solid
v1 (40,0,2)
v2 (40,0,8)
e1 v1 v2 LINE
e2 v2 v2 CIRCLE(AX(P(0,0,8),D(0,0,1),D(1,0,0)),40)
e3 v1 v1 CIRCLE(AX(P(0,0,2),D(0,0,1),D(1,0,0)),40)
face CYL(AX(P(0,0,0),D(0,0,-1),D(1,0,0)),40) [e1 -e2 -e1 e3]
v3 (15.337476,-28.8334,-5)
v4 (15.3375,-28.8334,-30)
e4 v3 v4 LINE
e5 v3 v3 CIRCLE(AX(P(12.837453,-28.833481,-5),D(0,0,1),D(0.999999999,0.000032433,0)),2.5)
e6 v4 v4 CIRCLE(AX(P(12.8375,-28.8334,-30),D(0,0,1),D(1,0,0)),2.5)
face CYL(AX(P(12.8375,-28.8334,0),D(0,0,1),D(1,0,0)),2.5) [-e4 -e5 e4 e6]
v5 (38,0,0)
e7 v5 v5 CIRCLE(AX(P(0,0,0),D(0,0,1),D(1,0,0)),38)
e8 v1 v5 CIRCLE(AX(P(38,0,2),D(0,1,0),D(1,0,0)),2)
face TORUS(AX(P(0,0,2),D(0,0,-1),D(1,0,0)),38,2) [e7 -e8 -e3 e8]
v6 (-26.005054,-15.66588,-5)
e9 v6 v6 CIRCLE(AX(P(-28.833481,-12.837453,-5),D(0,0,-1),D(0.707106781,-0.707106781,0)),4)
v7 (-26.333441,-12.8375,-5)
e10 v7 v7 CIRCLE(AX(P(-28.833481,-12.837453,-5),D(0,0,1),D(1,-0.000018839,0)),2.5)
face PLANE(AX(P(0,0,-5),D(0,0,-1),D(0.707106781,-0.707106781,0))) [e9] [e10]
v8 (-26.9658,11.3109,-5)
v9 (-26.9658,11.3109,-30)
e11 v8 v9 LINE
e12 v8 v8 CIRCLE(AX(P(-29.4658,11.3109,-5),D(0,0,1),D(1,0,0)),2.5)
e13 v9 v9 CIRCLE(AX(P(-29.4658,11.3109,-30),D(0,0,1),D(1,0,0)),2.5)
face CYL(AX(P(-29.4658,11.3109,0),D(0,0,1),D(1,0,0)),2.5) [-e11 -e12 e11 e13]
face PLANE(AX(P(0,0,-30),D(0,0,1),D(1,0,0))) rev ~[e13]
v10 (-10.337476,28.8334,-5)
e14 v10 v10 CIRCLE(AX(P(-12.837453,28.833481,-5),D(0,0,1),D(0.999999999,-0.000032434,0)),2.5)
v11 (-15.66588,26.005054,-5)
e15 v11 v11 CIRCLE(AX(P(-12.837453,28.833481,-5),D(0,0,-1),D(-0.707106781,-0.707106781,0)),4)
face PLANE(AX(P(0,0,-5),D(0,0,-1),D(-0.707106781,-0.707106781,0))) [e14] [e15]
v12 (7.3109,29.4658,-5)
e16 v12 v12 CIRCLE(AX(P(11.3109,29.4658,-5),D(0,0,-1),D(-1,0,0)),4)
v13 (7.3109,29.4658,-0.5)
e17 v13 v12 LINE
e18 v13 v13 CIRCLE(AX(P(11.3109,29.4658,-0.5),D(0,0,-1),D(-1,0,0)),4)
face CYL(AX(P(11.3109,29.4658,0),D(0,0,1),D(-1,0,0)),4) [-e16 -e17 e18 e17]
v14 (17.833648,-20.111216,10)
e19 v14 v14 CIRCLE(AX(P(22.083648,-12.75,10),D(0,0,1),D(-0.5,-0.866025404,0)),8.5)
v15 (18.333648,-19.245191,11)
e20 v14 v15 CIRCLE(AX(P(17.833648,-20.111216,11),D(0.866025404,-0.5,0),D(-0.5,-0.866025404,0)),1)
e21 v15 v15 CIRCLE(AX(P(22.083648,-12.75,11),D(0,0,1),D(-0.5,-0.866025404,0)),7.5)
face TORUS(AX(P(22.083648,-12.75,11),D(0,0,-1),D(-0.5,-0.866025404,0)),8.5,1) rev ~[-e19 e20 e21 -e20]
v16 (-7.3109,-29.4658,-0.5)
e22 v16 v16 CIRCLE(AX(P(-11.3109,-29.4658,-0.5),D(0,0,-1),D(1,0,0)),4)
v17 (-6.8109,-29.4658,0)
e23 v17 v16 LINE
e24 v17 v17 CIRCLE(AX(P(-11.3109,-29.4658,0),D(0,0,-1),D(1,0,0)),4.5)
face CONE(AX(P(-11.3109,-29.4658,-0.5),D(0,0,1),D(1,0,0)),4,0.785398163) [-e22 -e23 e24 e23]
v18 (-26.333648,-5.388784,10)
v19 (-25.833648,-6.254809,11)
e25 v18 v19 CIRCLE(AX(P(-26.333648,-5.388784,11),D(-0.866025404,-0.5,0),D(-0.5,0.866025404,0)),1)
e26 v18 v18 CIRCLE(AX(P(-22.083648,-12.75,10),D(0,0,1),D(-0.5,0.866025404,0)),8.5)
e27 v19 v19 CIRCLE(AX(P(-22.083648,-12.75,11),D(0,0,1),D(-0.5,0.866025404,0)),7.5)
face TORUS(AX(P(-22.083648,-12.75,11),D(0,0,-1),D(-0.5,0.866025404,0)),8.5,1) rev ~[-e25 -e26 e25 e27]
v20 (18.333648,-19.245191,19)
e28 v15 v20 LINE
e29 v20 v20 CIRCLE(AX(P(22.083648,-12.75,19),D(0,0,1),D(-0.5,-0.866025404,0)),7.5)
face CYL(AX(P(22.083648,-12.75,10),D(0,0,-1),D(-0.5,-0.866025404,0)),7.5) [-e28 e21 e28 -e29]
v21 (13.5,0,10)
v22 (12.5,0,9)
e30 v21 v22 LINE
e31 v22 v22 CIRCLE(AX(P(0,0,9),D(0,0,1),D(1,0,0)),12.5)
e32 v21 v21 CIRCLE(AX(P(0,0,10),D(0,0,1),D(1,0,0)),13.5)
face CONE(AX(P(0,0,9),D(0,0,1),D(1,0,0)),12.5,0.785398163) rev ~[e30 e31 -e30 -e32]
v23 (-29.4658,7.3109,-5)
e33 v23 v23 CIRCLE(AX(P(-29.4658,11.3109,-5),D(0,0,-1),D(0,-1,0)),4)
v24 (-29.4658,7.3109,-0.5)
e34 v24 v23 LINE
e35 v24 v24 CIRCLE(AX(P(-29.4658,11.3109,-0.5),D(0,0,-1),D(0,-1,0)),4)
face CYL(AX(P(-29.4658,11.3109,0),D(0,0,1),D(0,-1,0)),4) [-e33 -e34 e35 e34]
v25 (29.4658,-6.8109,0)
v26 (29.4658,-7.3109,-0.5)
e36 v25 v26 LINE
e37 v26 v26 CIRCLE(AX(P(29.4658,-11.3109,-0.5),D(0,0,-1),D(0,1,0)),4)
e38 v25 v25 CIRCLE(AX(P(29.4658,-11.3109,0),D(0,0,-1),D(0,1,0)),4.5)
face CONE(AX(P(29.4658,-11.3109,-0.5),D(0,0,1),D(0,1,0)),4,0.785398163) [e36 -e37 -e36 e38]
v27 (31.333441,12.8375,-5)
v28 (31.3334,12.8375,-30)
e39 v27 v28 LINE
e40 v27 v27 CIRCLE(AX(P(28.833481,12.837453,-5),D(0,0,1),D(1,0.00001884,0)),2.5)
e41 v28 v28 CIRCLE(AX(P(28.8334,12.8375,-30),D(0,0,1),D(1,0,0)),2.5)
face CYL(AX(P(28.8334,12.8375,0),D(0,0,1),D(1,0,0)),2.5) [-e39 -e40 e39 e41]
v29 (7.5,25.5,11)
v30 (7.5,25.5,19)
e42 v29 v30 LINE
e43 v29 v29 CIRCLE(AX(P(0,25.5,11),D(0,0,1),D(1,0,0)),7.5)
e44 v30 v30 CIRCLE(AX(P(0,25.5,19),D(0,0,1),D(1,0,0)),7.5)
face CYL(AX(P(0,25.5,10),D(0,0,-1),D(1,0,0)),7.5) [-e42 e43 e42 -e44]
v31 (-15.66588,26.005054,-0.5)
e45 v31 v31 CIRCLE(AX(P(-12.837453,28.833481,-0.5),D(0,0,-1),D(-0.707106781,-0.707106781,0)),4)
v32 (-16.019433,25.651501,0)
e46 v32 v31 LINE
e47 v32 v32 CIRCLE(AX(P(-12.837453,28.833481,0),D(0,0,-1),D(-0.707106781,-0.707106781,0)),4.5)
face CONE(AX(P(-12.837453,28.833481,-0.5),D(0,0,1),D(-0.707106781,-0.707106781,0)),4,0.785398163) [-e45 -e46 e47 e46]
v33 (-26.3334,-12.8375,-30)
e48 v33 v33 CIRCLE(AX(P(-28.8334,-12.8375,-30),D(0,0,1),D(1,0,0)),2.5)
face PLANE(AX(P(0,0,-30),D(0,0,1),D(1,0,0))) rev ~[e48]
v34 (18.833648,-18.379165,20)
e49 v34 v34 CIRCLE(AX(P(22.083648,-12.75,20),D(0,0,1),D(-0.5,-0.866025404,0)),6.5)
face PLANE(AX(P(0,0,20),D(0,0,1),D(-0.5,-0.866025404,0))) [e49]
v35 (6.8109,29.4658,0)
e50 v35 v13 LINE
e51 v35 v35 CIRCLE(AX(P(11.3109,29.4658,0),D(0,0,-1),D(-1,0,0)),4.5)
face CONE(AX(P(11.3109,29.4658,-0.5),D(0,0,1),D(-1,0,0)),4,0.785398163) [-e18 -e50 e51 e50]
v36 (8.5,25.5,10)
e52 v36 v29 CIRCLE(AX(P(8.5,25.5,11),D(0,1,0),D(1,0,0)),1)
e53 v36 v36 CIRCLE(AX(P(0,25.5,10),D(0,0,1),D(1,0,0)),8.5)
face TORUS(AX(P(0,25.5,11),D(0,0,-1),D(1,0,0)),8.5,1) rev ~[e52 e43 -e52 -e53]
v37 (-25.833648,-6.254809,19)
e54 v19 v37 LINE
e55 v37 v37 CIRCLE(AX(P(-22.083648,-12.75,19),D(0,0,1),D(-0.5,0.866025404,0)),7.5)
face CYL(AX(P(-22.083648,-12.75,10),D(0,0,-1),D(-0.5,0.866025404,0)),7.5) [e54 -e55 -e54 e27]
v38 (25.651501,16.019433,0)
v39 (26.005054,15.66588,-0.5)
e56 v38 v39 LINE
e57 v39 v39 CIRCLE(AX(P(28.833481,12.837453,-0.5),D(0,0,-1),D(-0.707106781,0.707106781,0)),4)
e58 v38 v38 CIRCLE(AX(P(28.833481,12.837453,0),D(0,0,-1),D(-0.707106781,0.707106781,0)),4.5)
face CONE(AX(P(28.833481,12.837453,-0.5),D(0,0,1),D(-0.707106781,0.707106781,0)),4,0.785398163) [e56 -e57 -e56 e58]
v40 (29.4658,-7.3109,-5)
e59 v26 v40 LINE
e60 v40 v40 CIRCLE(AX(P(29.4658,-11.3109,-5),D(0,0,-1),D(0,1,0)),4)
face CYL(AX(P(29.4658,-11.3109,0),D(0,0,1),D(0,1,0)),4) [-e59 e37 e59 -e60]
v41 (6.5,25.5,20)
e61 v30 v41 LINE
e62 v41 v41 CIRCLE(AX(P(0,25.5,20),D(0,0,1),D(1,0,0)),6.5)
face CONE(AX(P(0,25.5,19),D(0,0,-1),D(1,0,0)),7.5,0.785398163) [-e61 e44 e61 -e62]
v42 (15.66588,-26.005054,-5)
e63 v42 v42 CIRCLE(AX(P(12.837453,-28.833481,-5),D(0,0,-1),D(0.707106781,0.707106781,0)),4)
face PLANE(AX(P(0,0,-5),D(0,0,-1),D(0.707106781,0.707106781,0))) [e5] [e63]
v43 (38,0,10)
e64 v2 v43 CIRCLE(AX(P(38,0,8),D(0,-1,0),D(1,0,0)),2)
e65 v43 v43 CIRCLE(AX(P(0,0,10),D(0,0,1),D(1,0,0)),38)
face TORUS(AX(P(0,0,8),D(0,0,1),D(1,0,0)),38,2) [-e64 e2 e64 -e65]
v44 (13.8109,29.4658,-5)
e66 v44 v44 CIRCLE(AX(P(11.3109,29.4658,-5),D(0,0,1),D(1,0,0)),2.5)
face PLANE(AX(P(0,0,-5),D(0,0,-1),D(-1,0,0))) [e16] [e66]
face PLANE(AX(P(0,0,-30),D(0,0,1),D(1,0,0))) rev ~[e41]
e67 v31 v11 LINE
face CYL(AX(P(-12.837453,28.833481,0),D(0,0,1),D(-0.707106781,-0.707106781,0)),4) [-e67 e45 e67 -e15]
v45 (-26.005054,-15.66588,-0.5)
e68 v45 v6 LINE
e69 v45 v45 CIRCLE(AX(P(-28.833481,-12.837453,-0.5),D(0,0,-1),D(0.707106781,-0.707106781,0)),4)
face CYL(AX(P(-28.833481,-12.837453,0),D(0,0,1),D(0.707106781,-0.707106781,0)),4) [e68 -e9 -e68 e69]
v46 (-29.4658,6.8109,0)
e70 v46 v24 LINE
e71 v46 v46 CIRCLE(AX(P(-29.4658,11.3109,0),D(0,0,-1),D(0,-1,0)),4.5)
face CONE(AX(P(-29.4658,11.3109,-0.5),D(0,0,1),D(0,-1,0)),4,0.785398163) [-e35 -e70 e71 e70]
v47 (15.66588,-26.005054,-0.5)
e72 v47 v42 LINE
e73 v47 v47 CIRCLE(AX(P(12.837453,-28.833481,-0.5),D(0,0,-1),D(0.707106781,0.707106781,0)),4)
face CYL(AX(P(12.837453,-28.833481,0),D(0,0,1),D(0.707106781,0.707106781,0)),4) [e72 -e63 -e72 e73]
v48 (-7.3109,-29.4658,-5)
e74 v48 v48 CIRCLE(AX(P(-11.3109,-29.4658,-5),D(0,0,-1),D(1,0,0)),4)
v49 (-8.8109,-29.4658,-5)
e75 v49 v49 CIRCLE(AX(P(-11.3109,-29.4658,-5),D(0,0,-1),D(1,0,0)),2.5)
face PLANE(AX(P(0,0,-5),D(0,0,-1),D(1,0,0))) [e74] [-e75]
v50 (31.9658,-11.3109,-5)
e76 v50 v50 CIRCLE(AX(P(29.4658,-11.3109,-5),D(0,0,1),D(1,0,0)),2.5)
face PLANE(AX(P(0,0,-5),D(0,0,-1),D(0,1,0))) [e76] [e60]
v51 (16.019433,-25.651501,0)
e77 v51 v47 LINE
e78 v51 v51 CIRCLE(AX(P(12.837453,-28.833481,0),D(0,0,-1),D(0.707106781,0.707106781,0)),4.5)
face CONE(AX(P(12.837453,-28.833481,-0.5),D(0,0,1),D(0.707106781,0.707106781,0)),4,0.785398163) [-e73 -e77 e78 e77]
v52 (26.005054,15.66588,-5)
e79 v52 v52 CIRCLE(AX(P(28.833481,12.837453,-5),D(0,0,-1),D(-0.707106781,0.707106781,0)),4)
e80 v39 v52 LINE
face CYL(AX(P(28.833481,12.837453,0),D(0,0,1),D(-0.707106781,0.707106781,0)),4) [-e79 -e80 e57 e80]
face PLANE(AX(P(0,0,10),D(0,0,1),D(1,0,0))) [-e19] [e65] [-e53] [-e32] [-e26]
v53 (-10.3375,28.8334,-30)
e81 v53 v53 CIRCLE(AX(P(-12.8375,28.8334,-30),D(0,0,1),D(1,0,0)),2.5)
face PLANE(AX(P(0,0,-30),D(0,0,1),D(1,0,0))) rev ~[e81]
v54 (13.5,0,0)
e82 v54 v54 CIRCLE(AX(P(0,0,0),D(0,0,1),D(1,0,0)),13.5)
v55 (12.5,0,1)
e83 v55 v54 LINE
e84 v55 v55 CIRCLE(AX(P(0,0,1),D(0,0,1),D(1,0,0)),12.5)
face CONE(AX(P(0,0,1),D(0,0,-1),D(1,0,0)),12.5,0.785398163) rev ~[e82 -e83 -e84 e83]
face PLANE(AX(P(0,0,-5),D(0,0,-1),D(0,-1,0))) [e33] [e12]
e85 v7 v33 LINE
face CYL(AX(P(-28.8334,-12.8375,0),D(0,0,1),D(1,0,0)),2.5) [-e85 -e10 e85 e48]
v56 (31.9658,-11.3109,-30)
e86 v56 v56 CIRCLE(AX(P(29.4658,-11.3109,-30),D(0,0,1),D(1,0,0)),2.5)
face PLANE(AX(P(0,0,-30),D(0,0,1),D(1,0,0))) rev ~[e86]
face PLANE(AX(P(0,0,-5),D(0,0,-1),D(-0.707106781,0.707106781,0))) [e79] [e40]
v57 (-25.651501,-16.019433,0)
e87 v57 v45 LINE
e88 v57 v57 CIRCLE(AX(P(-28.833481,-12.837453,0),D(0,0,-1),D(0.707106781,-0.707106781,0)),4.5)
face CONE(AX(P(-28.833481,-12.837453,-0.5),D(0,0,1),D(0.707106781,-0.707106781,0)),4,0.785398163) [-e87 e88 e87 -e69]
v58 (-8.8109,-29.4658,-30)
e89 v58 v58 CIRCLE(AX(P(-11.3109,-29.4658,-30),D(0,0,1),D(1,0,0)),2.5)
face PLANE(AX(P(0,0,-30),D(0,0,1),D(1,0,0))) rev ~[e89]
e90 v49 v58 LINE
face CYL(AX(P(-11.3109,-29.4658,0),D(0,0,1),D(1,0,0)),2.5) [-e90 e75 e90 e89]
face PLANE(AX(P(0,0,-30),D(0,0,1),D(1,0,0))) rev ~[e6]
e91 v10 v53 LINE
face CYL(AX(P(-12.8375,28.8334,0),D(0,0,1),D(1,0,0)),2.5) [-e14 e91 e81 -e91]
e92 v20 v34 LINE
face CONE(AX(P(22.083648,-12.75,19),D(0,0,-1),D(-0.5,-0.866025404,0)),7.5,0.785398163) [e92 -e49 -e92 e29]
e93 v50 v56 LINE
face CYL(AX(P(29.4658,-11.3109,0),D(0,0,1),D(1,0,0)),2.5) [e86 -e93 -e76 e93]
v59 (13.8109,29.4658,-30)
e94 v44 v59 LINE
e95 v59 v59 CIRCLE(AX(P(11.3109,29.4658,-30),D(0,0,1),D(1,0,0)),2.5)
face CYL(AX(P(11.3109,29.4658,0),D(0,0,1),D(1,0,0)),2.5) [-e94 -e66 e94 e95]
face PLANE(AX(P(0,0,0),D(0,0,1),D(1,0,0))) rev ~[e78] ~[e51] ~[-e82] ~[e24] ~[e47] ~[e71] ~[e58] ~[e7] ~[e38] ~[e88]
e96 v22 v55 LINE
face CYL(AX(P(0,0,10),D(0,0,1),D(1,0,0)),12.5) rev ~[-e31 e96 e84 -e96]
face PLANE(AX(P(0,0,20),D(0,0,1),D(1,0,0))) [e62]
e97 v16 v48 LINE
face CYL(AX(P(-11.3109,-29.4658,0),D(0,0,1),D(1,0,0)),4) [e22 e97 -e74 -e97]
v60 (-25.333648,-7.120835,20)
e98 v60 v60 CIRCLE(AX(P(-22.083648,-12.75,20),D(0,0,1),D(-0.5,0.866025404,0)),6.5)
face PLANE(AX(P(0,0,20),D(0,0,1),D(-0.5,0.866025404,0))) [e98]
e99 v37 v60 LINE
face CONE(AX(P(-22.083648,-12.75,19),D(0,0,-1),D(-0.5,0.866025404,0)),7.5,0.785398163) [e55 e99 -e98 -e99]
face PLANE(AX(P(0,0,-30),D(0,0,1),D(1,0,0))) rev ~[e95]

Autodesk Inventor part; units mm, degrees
ref_plane "YZ Plane" through (0, 0, 0) normal (1, 0, 0) x (0, 1, 0)
ref_plane "XZ Plane" through (0, 0, 0) normal (0, 1, 0) x (-1, 0, 0)
ref_plane "XY Plane" through (0, 0, 0) normal (0, 0, 1) x (1, 0, 0)
sketch "Sketch1" plane through (0, 0, 0) normal (0, 0, 1) x (1, 0, 0)
  circle A0 centre (-12.8375, 28.8334) radius 2.5
  circle A1 centre (11.3109, 29.4658) radius 2.5
  circle A2 centre (28.8334, 12.8375) radius 2.5
  circle A3 centre (29.4658, -11.3109) radius 2.5
  circle A4 centre (12.8375, -28.8334) radius 2.5
  circle A5 centre (-11.3109, -29.4658) radius 2.5
  circle A6 centre (-28.8334, -12.8375) radius 2.5
  circle A7 centre (-29.4658, 11.3109) radius 2.5
  circle A8 centre (0, 0) radius 31.5621
  circle A9 centre (0, 0) radius 40
  dimension "d0" = 80
extrude "Extrusion1" add sketch "Sketch1" against normal blind 30 contours A0 A8 | A8 A0 | A8 A1 | A1 A8 | A8 A7 | A7 A8 | A8 A2 | A2 A8 | A8 A6 | A6 A8 | A8 A5 | A5 A8 | A8 A3 | A3 A8 | A8 A4 | A4 A8
extrude "Extrusion2" add sketch "Sketch1" along normal blind 10 contours A0 A8 | A0 A8 A1 A2 A3 A4 A5 A6 A7 | A8 A0 | A8 A1 | A1 A8 | A8 A7 | A7 A8 | A8 A2 | A2 A8 | A8 A6 | A6 A8 | A8 A5 | A5 A8 | A8 A3 | A3 A8 | A8 A4 | A4 A8 | A9
sketch "Sketch2" plane through (0, 0, 0) normal (0, 0, -1) x (-1, 0, 0)
  point P0 (0, 0)
sketch "Sketch3" plane through (0, 0, 0) normal (0, 0, -1) x (-1, 0, 0)
  circle A0 centre (-11.3109, 29.4658) radius 2.5 projected
  circle A1 centre (-11.3109, 29.4658) radius 4
  point P0 (0, 0)
  dimension "d8" = 8
extrude "Extrusion3" add sketch "Sketch3" along normal blind 5
pattern_circular "Circular Pattern1" count 8 over 360 about axis through (0, 0, -10) along (0, 0, 1) of "Extrusion3"
fillet "Fillet1" radius 2 1 edges at (-40, 0, 10)
fillet "Fillet2" radius 2 1 edges at (-40, 0, 0)
chamfer "Chamfer2" distance 0.5 angle 45 8 edges at (29.4658, -15.3109, 0) (31.6619, 10.0091, 0) (15.3109, 29.4658, 0) (-10.0091, 31.6619, 0) (-29.4658, 15.3109, 0) (10.0091, -31.6619, 0) (-15.3109, -29.4658, 0) (-31.6619, -10.0091, 0)
sketch "Sketch4" plane through (0, 0, 10) normal (0, 0, 1) x (1, 0, 0)
  circle A0 centre (0, 0) radius 12.5
  dimension "d19" = 25
extrude "Extrusion4" cut sketch "Sketch4" against normal through all
sketch "Sketch5" plane through (0, 0, 10) normal (0, 0, 1) x (1, 0, 0)
  circle A0 centre (0, 25.5) radius 7.5
  circle A1 centre (0, 0) radius 12.5 projected
  circle A2 centre (0, 0) radius 38 projected
  dimension "d22" = 76
  dimension "d23" = 25
  dimension "d24" = 25.5
  dimension "d25" = 15
extrude "Extrusion5" add sketch "Sketch5" along normal blind 10 contours A0
fillet "Fillet3" radius 1 1 edges at (-7.5, 25.5, 10)
chamfer "Chamfer3" distance 1 angle 45 1 edges at (-7.5, 25.5, 20)
pattern_circular "Circular Pattern2" count 3 over 360 about axis through (0, 0, -10) along (0, 0, 1) of "Extrusion5", "Fillet3", "Chamfer3"
chamfer "Chamfer4" distance 1 angle 45 2 edges at (-12.5, 0, 10) (-12.5, 0, 0)
properties part number "Connection disc of gear"
